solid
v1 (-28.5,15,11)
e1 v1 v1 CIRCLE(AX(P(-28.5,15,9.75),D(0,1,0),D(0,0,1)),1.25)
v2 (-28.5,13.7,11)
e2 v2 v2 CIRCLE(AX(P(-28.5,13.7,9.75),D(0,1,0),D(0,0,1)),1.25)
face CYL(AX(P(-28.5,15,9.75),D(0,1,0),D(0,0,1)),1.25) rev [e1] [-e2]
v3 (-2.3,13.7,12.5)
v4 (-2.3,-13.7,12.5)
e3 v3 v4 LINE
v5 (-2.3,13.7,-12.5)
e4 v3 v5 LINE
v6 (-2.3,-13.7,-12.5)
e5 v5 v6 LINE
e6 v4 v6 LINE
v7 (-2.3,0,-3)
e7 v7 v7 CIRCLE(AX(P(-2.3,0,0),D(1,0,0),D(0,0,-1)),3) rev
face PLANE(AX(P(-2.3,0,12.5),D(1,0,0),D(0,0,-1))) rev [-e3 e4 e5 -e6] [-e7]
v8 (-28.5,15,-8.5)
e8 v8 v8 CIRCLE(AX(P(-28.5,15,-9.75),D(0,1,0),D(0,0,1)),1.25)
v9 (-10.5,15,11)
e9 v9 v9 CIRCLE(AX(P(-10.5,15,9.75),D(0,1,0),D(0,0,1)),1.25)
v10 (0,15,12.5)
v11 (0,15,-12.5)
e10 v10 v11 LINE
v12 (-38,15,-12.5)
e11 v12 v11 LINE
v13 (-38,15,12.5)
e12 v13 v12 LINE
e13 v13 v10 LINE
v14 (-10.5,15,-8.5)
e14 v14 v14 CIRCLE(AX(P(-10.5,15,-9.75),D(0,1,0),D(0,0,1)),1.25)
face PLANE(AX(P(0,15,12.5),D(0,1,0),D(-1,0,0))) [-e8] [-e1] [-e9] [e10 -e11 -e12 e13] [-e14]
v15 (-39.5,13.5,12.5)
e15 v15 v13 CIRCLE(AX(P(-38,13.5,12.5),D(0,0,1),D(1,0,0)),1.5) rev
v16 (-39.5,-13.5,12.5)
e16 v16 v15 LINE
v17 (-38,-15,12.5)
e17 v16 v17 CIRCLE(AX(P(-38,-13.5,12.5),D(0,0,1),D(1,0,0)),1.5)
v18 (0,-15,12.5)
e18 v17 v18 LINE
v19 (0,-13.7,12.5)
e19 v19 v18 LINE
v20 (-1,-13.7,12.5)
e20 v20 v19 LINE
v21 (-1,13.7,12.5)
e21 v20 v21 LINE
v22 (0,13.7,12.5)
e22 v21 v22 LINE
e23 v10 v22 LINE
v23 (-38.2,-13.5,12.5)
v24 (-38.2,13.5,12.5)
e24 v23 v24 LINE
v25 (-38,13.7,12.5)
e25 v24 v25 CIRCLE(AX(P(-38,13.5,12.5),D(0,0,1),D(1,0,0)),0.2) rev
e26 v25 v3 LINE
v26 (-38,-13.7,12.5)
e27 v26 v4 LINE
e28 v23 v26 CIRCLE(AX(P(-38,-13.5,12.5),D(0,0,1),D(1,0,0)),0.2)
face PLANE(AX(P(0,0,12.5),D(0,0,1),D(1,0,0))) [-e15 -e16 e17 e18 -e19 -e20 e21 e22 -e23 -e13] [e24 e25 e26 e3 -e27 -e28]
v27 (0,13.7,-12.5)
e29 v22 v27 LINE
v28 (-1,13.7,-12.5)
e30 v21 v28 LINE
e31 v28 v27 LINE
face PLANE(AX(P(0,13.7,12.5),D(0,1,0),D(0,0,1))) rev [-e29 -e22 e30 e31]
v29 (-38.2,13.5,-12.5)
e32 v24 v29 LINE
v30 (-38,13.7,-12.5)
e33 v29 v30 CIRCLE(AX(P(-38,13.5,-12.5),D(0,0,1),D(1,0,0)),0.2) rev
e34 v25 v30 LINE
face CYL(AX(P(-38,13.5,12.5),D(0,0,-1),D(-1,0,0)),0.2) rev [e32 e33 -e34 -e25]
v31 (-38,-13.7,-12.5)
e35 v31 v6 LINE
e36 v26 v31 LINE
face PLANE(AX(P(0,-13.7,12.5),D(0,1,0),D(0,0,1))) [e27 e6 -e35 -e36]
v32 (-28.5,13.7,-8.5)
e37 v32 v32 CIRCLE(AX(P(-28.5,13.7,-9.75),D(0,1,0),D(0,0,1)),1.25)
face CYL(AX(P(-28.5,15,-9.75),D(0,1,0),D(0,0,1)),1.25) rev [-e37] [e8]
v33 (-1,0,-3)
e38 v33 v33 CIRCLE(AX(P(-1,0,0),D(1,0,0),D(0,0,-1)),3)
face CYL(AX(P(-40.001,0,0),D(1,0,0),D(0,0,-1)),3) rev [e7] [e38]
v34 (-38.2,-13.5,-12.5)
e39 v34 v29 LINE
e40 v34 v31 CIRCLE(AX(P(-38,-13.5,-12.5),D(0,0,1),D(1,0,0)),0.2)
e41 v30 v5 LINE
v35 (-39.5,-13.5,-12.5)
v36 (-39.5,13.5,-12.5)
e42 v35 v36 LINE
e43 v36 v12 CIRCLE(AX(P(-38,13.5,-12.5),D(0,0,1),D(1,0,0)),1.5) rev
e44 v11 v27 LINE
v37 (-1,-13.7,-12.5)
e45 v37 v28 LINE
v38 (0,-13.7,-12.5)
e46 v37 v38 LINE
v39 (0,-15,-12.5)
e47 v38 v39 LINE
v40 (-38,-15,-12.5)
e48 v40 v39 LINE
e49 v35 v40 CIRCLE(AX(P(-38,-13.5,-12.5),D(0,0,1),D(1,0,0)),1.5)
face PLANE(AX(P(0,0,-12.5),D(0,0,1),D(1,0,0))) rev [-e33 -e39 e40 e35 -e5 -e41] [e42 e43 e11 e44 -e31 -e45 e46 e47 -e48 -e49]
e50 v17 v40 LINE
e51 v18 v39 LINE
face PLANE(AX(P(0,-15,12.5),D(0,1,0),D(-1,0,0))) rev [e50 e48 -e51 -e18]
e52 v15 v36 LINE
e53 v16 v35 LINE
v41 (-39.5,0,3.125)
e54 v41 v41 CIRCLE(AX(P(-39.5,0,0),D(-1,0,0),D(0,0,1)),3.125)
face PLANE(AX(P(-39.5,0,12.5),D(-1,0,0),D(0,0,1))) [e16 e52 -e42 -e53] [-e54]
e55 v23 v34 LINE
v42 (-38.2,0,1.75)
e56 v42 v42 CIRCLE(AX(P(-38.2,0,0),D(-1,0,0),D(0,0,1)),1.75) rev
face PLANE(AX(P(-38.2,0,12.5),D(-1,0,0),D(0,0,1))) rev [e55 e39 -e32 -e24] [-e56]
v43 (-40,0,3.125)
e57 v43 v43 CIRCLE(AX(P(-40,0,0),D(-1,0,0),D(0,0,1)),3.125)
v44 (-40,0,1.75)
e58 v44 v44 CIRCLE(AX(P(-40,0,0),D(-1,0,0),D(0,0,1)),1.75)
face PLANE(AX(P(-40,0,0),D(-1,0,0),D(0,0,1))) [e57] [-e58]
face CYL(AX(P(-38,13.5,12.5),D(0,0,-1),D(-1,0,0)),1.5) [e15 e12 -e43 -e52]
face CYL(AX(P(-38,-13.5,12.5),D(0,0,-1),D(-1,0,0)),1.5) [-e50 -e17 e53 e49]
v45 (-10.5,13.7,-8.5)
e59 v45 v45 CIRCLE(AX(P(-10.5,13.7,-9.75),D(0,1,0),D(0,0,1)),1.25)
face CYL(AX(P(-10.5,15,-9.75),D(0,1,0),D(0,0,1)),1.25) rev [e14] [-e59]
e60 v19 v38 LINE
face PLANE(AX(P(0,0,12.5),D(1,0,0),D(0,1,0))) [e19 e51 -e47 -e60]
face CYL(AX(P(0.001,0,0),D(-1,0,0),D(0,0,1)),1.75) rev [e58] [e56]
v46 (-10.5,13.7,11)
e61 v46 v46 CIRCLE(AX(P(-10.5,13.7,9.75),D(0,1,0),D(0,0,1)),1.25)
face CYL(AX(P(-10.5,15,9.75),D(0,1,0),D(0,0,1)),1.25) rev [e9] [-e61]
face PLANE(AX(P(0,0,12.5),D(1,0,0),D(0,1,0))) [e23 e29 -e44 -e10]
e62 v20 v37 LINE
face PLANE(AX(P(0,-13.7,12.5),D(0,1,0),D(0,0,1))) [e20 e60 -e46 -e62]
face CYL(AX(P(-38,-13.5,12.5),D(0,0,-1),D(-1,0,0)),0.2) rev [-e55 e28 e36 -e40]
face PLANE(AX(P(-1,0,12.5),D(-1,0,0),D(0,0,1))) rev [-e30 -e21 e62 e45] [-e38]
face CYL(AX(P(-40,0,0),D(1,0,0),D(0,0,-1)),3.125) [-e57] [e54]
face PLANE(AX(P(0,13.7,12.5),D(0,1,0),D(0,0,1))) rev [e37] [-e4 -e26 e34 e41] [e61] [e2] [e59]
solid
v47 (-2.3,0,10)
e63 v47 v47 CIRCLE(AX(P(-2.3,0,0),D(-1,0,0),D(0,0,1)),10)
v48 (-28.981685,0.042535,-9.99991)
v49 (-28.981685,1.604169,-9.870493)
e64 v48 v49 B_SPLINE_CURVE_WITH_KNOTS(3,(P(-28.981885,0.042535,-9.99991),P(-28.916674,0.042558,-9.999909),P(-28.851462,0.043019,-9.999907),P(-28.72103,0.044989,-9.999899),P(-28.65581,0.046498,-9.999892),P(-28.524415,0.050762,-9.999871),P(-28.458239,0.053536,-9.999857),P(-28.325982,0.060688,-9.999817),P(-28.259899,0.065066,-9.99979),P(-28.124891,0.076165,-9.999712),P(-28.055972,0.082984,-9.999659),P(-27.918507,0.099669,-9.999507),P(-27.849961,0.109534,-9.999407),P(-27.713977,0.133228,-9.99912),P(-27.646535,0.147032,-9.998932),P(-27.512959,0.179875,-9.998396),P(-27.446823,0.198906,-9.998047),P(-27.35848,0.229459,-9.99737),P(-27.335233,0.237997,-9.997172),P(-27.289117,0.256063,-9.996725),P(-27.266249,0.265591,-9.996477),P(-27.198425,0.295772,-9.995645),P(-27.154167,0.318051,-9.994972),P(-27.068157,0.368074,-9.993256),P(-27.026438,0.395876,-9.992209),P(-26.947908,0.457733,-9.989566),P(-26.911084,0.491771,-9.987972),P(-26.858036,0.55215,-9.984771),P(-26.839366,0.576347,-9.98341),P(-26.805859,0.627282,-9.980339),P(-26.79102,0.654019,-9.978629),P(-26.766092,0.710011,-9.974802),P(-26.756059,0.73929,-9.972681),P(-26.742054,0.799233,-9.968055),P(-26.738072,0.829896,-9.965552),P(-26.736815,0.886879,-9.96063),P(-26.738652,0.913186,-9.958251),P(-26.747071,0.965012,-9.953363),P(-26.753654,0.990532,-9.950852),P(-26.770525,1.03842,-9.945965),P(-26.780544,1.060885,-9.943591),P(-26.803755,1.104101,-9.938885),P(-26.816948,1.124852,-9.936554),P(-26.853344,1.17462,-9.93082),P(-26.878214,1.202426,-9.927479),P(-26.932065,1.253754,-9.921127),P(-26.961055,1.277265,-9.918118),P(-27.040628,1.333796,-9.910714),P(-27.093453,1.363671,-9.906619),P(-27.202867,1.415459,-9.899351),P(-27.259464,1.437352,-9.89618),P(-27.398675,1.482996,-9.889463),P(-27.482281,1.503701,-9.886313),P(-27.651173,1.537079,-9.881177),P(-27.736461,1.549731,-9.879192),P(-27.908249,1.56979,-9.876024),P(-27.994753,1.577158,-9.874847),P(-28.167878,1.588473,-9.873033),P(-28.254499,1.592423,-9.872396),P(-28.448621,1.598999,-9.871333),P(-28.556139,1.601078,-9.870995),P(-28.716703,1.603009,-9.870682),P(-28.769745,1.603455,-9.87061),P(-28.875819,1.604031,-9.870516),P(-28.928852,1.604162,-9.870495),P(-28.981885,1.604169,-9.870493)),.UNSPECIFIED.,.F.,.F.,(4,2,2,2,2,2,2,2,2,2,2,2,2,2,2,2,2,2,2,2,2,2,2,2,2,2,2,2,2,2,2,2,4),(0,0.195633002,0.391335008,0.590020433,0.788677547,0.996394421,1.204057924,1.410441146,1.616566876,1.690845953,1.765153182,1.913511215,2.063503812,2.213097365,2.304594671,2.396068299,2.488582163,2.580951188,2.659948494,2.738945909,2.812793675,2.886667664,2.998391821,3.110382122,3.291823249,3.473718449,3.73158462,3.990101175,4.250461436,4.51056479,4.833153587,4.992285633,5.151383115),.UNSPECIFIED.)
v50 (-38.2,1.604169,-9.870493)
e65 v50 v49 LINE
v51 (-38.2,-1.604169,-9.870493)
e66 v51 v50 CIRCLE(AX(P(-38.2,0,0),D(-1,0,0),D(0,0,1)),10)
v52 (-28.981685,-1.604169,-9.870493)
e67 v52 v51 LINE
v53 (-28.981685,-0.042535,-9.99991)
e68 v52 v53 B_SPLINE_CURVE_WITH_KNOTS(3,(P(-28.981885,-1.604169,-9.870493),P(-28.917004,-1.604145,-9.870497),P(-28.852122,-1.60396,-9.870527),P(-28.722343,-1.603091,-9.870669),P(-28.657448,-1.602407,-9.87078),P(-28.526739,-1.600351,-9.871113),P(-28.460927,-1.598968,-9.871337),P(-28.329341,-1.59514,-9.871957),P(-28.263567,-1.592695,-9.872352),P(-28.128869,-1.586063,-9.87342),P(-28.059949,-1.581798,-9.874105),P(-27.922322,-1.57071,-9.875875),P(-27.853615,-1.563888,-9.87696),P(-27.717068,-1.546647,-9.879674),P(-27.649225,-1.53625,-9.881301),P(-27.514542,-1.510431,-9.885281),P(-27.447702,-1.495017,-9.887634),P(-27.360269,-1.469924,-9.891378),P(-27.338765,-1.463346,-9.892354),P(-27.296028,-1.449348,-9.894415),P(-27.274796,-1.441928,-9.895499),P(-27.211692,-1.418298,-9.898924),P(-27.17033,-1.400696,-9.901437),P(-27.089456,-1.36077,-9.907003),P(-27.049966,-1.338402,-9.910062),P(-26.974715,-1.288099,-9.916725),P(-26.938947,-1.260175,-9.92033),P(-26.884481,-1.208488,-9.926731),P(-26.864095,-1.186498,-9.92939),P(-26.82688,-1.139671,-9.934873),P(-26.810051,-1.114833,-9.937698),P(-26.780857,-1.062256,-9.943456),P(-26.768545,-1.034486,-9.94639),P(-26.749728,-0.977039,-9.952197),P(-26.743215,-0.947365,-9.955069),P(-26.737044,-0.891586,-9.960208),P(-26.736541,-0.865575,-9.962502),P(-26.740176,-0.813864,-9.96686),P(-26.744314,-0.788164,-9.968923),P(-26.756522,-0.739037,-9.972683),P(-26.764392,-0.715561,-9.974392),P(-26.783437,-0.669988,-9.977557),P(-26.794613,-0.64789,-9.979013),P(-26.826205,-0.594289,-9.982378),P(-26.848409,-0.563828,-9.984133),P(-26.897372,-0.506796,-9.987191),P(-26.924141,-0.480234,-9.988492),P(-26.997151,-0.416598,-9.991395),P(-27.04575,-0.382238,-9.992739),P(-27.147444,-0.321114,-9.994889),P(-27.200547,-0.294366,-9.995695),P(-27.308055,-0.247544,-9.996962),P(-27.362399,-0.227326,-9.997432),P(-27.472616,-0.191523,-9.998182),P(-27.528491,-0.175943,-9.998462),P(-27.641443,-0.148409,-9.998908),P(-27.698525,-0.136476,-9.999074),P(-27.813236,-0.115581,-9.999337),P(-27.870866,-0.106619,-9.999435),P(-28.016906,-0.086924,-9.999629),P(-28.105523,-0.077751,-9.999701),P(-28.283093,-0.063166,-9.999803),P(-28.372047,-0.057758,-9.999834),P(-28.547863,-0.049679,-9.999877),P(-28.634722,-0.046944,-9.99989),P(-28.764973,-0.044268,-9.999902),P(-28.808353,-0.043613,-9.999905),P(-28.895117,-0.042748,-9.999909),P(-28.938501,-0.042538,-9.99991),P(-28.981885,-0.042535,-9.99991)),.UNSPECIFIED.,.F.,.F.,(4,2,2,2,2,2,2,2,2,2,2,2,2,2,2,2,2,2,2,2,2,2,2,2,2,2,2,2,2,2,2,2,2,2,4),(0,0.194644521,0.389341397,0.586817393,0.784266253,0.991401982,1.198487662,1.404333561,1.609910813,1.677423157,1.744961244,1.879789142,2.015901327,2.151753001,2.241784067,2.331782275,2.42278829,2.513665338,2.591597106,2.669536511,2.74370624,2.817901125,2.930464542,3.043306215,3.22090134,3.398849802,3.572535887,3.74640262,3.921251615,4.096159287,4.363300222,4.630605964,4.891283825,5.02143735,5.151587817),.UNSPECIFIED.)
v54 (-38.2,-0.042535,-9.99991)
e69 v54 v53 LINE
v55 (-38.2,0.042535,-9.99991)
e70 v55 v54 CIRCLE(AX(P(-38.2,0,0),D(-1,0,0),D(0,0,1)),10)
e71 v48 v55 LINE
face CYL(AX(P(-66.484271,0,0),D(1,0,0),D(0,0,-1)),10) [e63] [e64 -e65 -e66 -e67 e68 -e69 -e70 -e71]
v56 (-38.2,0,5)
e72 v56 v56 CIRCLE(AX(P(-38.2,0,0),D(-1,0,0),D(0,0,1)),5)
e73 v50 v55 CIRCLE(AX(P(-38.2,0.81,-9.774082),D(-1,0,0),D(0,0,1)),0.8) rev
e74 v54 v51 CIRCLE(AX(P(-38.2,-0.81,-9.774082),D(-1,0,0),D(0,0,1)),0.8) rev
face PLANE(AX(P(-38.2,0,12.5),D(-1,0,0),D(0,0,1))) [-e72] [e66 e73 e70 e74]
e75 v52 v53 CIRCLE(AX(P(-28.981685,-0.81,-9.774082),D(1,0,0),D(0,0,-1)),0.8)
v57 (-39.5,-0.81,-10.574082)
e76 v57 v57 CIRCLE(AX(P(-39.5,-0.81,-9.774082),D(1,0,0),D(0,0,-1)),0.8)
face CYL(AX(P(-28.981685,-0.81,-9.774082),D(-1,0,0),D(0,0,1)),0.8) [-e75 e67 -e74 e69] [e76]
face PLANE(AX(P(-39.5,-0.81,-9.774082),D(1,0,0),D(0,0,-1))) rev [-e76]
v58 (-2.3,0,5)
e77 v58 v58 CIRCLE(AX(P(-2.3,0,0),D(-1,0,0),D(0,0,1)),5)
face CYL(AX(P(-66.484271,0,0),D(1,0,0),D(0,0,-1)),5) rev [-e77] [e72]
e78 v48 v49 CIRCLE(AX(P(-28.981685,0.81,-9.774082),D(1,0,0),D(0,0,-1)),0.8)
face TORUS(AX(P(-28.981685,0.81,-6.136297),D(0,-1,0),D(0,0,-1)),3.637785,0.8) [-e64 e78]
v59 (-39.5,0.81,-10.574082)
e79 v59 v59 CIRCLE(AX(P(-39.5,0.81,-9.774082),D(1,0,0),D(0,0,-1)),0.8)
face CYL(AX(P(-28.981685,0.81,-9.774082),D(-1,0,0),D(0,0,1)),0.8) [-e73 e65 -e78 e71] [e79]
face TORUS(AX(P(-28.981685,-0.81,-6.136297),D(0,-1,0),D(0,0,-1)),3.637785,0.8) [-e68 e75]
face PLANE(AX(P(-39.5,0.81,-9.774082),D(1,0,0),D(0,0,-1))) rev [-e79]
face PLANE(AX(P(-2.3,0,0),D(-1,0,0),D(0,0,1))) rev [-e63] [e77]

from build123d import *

# Parameters (mm, degrees)
SKETCH1_W                     = 1.3
SKETCH1_H                     = 27.4
HOUSING_DEPTH                 = 12.5
SKETCH2_R                     = 3.125
END_BOSS_DEPTH                = 0.5
SMALL_BORE_REACH              = 46.511
SKETCH3_R                     = 1.75
SKETCH4_R                     = 10
SKETCH4_R_2                   = 5
COIL_DEPTH                    = 35.9
SKETCH5_R                     = 3
LARGE_BORE_DEPTH              = 1.3
M3X0_5_START                  = 13.7
M3X0_5_TAPPED_HOLE1_OUTLINE_R = 1.25
M3X0_5_TAPPED_HOLE1_DEPTH     = 1.3
SKETCH11_R                    = 0.8


# Read off the part's stored shape, not the designer's step: M3x0.5 Tapped Hole1
with BuildPart() as part:
    # Sketch1 → Housing (new, symmetric)
    with BuildSketch(Plane.XY):
        with BuildLine():
            Line((-38.2, -13.5), (-38.2, 13.5))
            ThreePointArc((-38.2, 13.5), (-38.141421356, 13.641421356), (-38, 13.7))
            Line((-38, 13.7), (0, 13.7))
            Line((0, 13.7), (0, 15))
            Line((0, 15), (-38, 15))
            ThreePointArc((-38, 15), (-39.060660172, 14.560660172), (-39.5, 13.5))
            Line((-39.5, 13.5), (-39.5, -13.5))
            ThreePointArc((-39.5, -13.5), (-39.060660172, -14.560660172), (-38, -15))
            Line((-38, -15), (0, -15))
            Line((0, -15), (0, -13.7))
            Line((0, -13.7), (-38, -13.7))
            ThreePointArc((-38, -13.7), (-38.141421356, -13.641421356), (-38.2, -13.5))
        make_face()
        with Locations((-1.65, 0)):
            Rectangle(SKETCH1_W, SKETCH1_H)
    extrude(amount=HOUSING_DEPTH, both=True)

    # Sketch2 → End Boss (add)
    with BuildSketch(Plane.ZY.offset(39.5)):
        Circle(SKETCH2_R)
    extrude(amount=END_BOSS_DEPTH)

    # Sketch3 → Small Bore (cut, up to next)
    with BuildSketch(Plane.ZY.offset(40), mode=Mode.PRIVATE) as small_bore_sk1:
        Circle(SKETCH3_R)
    small_bore_tool1 = extrude(small_bore_sk1.sketch, amount=-SMALL_BORE_REACH, mode=Mode.PRIVATE) & part.part
    add(small_bore_tool1.solids().sort_by_distance((-40, 0, 0))[0], mode=Mode.SUBTRACT)

    # Sketch5 → Large Bore (cut)
    with BuildSketch(Plane(origin=(-1, 0, 0), x_dir=(0, 0, -1), z_dir=(1, 0, 0))):
        Circle(SKETCH5_R)
    extrude(amount=-LARGE_BORE_DEPTH, mode=Mode.SUBTRACT)

    # M3x0.5 Tapped Hole1 outline → M3x0.5 Tapped Hole1 (cut)
    with BuildSketch(Plane(origin=(0, 0, 0), x_dir=(1, 0, 0), z_dir=(0, 1, 0)).offset(M3X0_5_START)):
        with Locations((-28.5, 9.75)):
            Circle(M3X0_5_TAPPED_HOLE1_OUTLINE_R)
        with Locations((-10.5, 9.75)):
            Circle(M3X0_5_TAPPED_HOLE1_OUTLINE_R)
    m3x0_5_tapped_hole1 = extrude(amount=M3X0_5_TAPPED_HOLE1_DEPTH, mode=Mode.SUBTRACT)

    # Mirror1: M3x0.5 Tapped Hole1 across plane
    add(m3x0_5_tapped_hole1.mirror(Plane.XY), mode=Mode.SUBTRACT)


with BuildPart() as body_2:
    # Sketch4 → Coil (new body)
    with BuildSketch(Plane.ZY.offset(2.3)):
        Circle(SKETCH4_R)
        Circle(SKETCH4_R_2, mode=Mode.SUBTRACT)
    extrude(amount=COIL_DEPTH)

    # Wires 2: sweep along a path in Sketch12
    with BuildLine(Plane(origin=(0, 0, 0), x_dir=(1, 0, 0), z_dir=(0, 1, 0))) as wires_2_path:
        Line((-39.5, 9.774082389), (-28.981684691, 9.774082389))
        ThreePointArc((-28.981684691, 9.774082389), (-27.383714597, 9.404319945), (-26.110595638, 8.370201575))
        Line((-26.110595638, 8.370201575), (-24.934313388, 6.858404062))
    # Sketch11 → Wires 2 (sweep)
    with BuildSketch(Plane(origin=(-39.5, 0, 0), x_dir=(0, 0, -1), z_dir=(1, 0, 0))):
        with Locations((9.774082389, 0.81)):
            Circle(SKETCH11_R)
        with Locations((9.774082389, -0.81)):
            Circle(SKETCH11_R)
    sweep(path=wires_2_path.line)


solid = Compound([part.part, body_2.part])
